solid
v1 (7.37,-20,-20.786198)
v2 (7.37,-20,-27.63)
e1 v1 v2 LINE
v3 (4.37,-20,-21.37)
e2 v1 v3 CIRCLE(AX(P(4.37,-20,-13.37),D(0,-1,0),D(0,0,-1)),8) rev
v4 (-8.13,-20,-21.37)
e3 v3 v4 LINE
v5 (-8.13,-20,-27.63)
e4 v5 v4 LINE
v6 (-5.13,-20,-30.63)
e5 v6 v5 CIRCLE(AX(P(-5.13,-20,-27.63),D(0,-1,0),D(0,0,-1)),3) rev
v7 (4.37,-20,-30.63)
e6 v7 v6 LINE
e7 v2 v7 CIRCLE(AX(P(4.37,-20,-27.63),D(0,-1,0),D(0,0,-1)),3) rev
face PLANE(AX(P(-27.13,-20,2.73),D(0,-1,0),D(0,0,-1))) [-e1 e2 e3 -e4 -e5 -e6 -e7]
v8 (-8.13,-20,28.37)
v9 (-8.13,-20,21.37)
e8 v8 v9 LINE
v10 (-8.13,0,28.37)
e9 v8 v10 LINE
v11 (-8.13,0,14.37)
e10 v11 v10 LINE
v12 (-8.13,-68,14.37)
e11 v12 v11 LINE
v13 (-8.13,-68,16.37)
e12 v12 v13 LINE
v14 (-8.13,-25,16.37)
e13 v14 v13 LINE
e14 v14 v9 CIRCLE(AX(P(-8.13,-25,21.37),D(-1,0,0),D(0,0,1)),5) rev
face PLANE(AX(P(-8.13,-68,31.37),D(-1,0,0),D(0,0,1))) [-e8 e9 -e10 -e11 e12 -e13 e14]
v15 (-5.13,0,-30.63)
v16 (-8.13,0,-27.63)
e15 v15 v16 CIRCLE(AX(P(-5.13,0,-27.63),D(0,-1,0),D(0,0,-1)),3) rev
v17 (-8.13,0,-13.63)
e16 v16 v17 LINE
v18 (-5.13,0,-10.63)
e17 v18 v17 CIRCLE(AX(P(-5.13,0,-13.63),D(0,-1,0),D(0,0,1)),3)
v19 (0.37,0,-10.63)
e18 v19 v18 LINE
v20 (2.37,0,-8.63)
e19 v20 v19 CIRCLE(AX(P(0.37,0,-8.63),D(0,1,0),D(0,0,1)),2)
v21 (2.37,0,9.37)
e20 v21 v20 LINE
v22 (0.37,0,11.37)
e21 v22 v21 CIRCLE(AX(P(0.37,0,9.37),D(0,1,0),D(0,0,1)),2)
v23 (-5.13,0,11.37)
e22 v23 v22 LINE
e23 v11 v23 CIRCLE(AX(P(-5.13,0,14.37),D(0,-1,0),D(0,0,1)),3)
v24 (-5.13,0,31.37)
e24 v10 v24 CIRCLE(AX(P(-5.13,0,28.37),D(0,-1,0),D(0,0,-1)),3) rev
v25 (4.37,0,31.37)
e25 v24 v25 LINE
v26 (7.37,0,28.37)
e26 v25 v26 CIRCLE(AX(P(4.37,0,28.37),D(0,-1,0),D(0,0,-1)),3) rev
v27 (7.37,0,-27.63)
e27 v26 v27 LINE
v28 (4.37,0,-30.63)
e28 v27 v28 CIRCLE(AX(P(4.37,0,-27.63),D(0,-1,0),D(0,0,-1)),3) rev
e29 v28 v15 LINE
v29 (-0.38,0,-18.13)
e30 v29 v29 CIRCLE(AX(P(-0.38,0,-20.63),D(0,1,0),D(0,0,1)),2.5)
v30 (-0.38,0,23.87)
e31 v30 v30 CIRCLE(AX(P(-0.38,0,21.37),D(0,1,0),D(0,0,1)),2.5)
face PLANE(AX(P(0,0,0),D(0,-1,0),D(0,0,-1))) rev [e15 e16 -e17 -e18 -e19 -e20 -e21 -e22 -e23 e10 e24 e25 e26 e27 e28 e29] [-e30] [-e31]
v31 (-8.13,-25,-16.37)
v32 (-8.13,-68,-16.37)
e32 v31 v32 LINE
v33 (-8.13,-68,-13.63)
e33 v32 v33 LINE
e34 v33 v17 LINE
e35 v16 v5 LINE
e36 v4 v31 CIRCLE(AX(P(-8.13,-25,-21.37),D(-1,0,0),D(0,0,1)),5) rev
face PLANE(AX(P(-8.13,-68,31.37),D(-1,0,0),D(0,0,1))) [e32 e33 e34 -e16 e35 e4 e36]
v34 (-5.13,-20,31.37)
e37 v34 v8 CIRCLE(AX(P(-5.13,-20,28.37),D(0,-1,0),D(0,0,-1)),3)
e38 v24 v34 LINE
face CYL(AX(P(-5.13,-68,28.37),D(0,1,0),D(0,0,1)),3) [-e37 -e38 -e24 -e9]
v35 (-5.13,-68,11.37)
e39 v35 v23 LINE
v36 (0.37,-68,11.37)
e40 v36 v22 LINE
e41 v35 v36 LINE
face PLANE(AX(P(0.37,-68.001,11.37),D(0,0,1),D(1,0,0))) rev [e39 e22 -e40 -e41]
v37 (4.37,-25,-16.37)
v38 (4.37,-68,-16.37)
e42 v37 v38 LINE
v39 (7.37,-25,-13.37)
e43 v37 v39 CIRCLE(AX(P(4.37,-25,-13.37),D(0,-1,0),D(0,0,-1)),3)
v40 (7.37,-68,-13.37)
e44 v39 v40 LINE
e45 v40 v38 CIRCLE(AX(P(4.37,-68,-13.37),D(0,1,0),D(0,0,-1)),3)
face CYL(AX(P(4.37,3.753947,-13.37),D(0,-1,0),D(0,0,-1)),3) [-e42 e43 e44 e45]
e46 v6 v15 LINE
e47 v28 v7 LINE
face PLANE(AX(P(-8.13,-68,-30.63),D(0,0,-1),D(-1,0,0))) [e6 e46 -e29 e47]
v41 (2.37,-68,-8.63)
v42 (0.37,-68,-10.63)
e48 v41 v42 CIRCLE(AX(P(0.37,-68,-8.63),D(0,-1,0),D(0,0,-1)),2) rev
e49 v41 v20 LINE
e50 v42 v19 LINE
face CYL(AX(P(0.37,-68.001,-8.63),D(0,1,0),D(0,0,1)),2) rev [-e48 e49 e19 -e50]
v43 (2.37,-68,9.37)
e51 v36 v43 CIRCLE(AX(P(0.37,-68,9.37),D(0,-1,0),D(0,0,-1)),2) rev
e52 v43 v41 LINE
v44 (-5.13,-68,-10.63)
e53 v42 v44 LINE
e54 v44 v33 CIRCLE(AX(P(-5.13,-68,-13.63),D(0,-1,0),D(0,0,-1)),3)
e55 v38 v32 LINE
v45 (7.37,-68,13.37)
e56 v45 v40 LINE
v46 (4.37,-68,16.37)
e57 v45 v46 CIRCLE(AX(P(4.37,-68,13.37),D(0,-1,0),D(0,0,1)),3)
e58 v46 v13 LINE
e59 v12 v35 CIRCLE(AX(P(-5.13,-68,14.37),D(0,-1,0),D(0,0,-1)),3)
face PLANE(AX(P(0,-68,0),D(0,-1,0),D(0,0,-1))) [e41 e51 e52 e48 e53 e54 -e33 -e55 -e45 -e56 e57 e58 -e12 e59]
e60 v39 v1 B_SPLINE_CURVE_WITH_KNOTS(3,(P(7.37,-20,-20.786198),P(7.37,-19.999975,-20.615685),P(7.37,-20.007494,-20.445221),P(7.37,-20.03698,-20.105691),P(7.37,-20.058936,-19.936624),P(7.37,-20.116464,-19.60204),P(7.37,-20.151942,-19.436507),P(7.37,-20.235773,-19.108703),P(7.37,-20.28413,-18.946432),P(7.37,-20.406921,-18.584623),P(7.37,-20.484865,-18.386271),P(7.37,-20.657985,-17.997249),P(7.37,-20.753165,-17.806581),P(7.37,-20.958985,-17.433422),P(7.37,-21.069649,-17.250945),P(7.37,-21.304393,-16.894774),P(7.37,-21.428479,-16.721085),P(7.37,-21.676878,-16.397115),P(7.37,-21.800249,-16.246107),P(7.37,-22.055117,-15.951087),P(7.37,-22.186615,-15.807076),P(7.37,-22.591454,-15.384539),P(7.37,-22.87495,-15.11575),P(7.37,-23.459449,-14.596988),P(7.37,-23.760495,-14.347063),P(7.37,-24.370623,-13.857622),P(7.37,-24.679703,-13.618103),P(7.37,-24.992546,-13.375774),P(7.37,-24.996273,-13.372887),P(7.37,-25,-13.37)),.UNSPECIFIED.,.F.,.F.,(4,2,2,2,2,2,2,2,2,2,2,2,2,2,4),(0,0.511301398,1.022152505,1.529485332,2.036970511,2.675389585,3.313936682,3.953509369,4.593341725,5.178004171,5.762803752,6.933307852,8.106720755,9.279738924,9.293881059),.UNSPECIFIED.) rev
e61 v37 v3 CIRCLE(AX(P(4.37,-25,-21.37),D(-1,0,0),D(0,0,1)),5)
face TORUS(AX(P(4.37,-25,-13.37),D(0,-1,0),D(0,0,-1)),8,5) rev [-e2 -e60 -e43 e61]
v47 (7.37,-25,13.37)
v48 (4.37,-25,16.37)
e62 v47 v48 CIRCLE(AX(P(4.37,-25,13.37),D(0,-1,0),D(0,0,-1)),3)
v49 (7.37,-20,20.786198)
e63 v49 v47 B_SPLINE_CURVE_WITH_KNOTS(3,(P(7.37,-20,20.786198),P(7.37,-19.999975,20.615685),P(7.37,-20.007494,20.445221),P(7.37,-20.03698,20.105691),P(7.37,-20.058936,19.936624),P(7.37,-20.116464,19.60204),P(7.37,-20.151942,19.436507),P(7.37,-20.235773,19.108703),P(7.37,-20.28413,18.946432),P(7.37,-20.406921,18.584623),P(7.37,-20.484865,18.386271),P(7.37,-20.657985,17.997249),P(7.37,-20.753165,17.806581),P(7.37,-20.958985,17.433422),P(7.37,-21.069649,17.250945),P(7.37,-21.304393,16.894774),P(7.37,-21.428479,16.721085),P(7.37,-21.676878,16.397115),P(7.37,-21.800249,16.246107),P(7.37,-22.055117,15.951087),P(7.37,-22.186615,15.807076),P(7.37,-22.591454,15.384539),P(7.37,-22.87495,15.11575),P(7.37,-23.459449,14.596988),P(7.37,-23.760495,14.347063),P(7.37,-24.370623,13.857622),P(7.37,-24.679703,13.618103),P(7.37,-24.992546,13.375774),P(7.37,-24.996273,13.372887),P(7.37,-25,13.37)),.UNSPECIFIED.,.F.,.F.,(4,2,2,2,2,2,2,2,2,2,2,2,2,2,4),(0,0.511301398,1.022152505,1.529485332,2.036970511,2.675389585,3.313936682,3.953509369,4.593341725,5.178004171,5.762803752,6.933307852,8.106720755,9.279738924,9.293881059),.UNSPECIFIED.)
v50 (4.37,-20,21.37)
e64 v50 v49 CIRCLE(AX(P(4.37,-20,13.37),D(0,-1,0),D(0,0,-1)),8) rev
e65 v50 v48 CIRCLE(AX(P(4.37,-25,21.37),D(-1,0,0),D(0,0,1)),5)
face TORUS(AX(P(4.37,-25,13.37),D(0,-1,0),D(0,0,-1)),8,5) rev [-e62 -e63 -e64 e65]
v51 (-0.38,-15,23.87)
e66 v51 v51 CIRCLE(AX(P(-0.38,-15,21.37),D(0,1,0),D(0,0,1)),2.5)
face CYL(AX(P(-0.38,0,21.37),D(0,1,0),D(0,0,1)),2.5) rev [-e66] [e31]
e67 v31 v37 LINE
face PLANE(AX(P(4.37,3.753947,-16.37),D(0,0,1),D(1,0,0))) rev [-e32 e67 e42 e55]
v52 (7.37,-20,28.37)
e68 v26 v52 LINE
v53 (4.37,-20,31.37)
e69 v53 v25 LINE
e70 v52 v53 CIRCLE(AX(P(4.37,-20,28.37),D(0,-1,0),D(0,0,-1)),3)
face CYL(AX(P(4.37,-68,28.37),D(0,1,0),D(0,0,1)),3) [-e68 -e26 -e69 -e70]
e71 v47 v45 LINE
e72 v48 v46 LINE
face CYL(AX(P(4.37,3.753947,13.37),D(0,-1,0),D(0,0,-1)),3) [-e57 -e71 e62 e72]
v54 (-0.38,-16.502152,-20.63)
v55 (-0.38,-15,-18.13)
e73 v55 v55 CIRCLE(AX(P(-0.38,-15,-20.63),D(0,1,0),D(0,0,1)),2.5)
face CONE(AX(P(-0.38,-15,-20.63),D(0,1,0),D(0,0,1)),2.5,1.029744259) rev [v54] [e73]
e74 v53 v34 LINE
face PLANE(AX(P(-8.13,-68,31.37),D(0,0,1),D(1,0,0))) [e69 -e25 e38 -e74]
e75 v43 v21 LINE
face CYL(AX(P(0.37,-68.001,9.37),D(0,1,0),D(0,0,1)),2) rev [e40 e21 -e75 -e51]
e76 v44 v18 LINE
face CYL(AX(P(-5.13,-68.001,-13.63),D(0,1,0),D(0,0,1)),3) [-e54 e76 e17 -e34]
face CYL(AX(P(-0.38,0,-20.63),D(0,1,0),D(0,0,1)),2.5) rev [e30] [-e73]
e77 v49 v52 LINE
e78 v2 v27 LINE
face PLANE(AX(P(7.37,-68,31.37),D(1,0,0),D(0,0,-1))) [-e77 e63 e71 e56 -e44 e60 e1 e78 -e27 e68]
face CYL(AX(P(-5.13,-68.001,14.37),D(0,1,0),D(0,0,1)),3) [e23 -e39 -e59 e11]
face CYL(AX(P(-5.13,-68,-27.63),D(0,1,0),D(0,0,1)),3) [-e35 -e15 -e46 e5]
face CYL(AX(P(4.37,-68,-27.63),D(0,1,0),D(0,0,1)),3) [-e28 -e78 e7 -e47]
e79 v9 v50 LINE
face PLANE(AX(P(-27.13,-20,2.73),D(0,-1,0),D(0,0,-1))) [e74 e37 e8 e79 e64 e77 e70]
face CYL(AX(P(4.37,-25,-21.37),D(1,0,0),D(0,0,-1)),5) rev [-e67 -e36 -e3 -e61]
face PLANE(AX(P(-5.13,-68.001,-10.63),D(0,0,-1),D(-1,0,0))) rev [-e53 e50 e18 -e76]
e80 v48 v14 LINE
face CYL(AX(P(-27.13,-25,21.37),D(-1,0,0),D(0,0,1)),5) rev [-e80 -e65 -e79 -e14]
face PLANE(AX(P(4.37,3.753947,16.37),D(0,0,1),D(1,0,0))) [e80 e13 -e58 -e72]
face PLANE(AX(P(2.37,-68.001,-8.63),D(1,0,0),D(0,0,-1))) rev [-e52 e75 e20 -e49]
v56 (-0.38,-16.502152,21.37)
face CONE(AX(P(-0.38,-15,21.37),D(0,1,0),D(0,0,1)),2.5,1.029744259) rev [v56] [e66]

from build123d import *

# Parameters (mm, degrees)
SKETCH1_W             = 15.5
SKETCH1_H             = 62
BOSS_EXTRUDE1_DEPTH   = 68
FILLET1_R             = 3
CUT_EXTRUDE1_REACH    = 77.327
CUT_EXTRUDE2_DEPTH    = 48
FILLET2_R             = 5
M6_TAPPED_HOLE1_D     = 5
M6_TAPPED_HOLE1_DEPTH = 15
M6_TAPPED_HOLE1_TIP   = 1.502151548


with BuildPart() as part:
    # Sketch1 → Boss-Extrude1 (new body)
    with BuildSketch(Plane(origin=(0, 0, 0), x_dir=(1, 0, 0), z_dir=(0, 1, 0))):
        with Locations((-0.38, -0.37)):
            Rectangle(SKETCH1_W, SKETCH1_H)
    extrude(amount=-BOSS_EXTRUDE1_DEPTH)

    # Fillet1
    fillet1_edges = [part.edges().sort_by_distance(p)[0] for p in [
        (7.37, -34, 31.37),
        (-8.13, -34, 31.37),
        (-8.13, -34, -30.63),
        (7.37, -34, -30.63),
    ]]
    fillet(fillet1_edges, radius=FILLET1_R)

    # Sketch2 → Cut-Extrude1 (cut, up to next)
    with BuildSketch(Plane(origin=(0, 0, 0), x_dir=(1, 0, 0), z_dir=(0, 1, 0)), mode=Mode.PRIVATE) as cut_extrude1_sk1:
        with BuildLine():
            Line((-5.13, 10.63), (0.37, 10.63))
            ThreePointArc((0.37, 10.63), (1.784213562, 10.044213562), (2.37, 8.63))
            Line((2.37, 8.63), (2.37, -9.37))
            ThreePointArc((2.37, -9.37), (1.784213562, -10.784213562), (0.37, -11.37))
            Line((0.37, -11.37), (-5.13, -11.37))
            ThreePointArc((-5.13, -11.37), (-7.251320344, -12.248679656), (-8.13, -14.37))
            Line((-8.13, -14.37), (-8.13, 13.63))
            ThreePointArc((-8.13, 13.63), (-7.251320344, 11.508679656), (-5.13, 10.63))
        make_face()
    cut_extrude1_tool1 = extrude(cut_extrude1_sk1.sketch, amount=-CUT_EXTRUDE1_REACH, mode=Mode.PRIVATE) & part.part
    add(cut_extrude1_tool1.solids().sort_by_distance((-2.991251, 0, 0.37))[0], mode=Mode.SUBTRACT)

    # Sketch3 → Cut-Extrude2 (cut)
    with BuildSketch(Plane(origin=(0, -68, 0), x_dir=(1, 0, 0), z_dir=(0, 1, 0))):
        with BuildLine():
            Line((4.37, -16.37), (-8.13, -16.37))
            Line((-8.13, -16.37), (-8.13, -28.37))
            ThreePointArc((-8.13, -28.37), (-7.251320344, -30.491320344), (-5.13, -31.37))
            Line((-5.13, -31.37), (4.37, -31.37))
            ThreePointArc((4.37, -31.37), (6.491320344, -30.491320344), (7.37, -28.37))
            Line((7.37, -28.37), (7.37, -13.37))
            ThreePointArc((7.37, -13.37), (6.491320344, -15.491320344), (4.37, -16.37))
        make_face()
    cut_extrude2 = extrude(amount=CUT_EXTRUDE2_DEPTH, mode=Mode.SUBTRACT)

    # Mirror1: Cut-Extrude2 across plane
    add(cut_extrude2.mirror(Plane.XY), mode=Mode.SUBTRACT)

    # Fillet2
    # the kernel refuses this fillet: 5 mm, written as the material it adds along each edge
    with BuildSketch(Plane(origin=(4.37, -20, -16.37), x_dir=(0, -1, 0), z_dir=(-1, 0, 0)), Plane(origin=(4.37, -20, 16.37), x_dir=(0, 0, 1), z_dir=(-1, 0, 0))) as fillet2_piece_1:
        with BuildLine():
            CenterArc((FILLET2_R, -FILLET2_R), FILLET2_R, 90, 90)
            Line((0, -FILLET2_R), (0, 0))
            Line((0, 0), (FILLET2_R, 0))
        make_face()
    extrude(amount=12.5)
    with BuildSketch(Plane(origin=(4.37, -20, -13.37), x_dir=(-0.5176042277799098, 0, -0.855620163030514), z_dir=(0.855620163030514, 0, -0.5176042277799098))) as fillet2_piece_2_section:
        with BuildLine():
            CenterArc((-3 - FILLET2_R, -FILLET2_R), FILLET2_R, 0, 90)
            Line((-3, -FILLET2_R), (-3, 0))
            Line((-3, 0), (-3 - FILLET2_R, 0))
        make_face()
    fillet2_piece_2 = revolve(axis=Axis((4.37, -20, -13.37), (0, 1, 0)), revolution_arc=328.828315396, mode=Mode.PRIVATE)
    fillet2_piece_2 = split(fillet2_piece_2, bisect_by=Plane(origin=(6.644254363, -21.721658314, -10.63), z_dir=(0, 0, -1)), keep=Keep.TOP, mode=Mode.PRIVATE)
    fillet2_piece_2 = split(fillet2_piece_2, bisect_by=Plane(origin=(7.37, -21.721658314, -15.644254458), z_dir=(-1, 0, 0)), keep=Keep.TOP, mode=Mode.PRIVATE)
    add(fillet2_piece_2)
    with BuildSketch(Plane(origin=(4.37, -20, 13.37), x_dir=(-0.5176042277799098, 0, 0.855620163030514), z_dir=(0.855620163030514, 0, 0.5176042277799098))) as fillet2_piece_3_section:
        with BuildLine():
            CenterArc((-3 - FILLET2_R, FILLET2_R), FILLET2_R, 270, 90)
            Line((-3, FILLET2_R), (-3, 0))
            Line((-3, 0), (-3 - FILLET2_R, 0))
        make_face()
    fillet2_piece_3 = revolve(axis=Axis((4.37, -20, 13.37), (0, -1, 0)), revolution_arc=328.828315396, mode=Mode.PRIVATE)
    fillet2_piece_3 = split(fillet2_piece_3, bisect_by=Plane(origin=(6.644254403, -21.721658525, 11.37), z_dir=(0, 0, 1)), keep=Keep.TOP, mode=Mode.PRIVATE)
    fillet2_piece_3 = split(fillet2_piece_3, bisect_by=Plane(origin=(7.37, -21.721658525, 15.644254403), z_dir=(-1, 0, 0)), keep=Keep.TOP, mode=Mode.PRIVATE)
    add(fillet2_piece_3)

    # M6 Tapped Hole1
    with Locations(Plane(origin=(0, 0, 0), x_dir=(1, 0, 0), z_dir=(0, 1, 0))):
        with Locations((-0.38, 20.63), (-0.38, -21.37)):
            Hole(M6_TAPPED_HOLE1_D / 2, depth=M6_TAPPED_HOLE1_DEPTH)
            with Locations((0, 0, -(M6_TAPPED_HOLE1_DEPTH + M6_TAPPED_HOLE1_TIP / 2))):  # 118° drill point
                Cone(0, M6_TAPPED_HOLE1_D / 2, M6_TAPPED_HOLE1_TIP, mode=Mode.SUBTRACT)


solid = part.part
